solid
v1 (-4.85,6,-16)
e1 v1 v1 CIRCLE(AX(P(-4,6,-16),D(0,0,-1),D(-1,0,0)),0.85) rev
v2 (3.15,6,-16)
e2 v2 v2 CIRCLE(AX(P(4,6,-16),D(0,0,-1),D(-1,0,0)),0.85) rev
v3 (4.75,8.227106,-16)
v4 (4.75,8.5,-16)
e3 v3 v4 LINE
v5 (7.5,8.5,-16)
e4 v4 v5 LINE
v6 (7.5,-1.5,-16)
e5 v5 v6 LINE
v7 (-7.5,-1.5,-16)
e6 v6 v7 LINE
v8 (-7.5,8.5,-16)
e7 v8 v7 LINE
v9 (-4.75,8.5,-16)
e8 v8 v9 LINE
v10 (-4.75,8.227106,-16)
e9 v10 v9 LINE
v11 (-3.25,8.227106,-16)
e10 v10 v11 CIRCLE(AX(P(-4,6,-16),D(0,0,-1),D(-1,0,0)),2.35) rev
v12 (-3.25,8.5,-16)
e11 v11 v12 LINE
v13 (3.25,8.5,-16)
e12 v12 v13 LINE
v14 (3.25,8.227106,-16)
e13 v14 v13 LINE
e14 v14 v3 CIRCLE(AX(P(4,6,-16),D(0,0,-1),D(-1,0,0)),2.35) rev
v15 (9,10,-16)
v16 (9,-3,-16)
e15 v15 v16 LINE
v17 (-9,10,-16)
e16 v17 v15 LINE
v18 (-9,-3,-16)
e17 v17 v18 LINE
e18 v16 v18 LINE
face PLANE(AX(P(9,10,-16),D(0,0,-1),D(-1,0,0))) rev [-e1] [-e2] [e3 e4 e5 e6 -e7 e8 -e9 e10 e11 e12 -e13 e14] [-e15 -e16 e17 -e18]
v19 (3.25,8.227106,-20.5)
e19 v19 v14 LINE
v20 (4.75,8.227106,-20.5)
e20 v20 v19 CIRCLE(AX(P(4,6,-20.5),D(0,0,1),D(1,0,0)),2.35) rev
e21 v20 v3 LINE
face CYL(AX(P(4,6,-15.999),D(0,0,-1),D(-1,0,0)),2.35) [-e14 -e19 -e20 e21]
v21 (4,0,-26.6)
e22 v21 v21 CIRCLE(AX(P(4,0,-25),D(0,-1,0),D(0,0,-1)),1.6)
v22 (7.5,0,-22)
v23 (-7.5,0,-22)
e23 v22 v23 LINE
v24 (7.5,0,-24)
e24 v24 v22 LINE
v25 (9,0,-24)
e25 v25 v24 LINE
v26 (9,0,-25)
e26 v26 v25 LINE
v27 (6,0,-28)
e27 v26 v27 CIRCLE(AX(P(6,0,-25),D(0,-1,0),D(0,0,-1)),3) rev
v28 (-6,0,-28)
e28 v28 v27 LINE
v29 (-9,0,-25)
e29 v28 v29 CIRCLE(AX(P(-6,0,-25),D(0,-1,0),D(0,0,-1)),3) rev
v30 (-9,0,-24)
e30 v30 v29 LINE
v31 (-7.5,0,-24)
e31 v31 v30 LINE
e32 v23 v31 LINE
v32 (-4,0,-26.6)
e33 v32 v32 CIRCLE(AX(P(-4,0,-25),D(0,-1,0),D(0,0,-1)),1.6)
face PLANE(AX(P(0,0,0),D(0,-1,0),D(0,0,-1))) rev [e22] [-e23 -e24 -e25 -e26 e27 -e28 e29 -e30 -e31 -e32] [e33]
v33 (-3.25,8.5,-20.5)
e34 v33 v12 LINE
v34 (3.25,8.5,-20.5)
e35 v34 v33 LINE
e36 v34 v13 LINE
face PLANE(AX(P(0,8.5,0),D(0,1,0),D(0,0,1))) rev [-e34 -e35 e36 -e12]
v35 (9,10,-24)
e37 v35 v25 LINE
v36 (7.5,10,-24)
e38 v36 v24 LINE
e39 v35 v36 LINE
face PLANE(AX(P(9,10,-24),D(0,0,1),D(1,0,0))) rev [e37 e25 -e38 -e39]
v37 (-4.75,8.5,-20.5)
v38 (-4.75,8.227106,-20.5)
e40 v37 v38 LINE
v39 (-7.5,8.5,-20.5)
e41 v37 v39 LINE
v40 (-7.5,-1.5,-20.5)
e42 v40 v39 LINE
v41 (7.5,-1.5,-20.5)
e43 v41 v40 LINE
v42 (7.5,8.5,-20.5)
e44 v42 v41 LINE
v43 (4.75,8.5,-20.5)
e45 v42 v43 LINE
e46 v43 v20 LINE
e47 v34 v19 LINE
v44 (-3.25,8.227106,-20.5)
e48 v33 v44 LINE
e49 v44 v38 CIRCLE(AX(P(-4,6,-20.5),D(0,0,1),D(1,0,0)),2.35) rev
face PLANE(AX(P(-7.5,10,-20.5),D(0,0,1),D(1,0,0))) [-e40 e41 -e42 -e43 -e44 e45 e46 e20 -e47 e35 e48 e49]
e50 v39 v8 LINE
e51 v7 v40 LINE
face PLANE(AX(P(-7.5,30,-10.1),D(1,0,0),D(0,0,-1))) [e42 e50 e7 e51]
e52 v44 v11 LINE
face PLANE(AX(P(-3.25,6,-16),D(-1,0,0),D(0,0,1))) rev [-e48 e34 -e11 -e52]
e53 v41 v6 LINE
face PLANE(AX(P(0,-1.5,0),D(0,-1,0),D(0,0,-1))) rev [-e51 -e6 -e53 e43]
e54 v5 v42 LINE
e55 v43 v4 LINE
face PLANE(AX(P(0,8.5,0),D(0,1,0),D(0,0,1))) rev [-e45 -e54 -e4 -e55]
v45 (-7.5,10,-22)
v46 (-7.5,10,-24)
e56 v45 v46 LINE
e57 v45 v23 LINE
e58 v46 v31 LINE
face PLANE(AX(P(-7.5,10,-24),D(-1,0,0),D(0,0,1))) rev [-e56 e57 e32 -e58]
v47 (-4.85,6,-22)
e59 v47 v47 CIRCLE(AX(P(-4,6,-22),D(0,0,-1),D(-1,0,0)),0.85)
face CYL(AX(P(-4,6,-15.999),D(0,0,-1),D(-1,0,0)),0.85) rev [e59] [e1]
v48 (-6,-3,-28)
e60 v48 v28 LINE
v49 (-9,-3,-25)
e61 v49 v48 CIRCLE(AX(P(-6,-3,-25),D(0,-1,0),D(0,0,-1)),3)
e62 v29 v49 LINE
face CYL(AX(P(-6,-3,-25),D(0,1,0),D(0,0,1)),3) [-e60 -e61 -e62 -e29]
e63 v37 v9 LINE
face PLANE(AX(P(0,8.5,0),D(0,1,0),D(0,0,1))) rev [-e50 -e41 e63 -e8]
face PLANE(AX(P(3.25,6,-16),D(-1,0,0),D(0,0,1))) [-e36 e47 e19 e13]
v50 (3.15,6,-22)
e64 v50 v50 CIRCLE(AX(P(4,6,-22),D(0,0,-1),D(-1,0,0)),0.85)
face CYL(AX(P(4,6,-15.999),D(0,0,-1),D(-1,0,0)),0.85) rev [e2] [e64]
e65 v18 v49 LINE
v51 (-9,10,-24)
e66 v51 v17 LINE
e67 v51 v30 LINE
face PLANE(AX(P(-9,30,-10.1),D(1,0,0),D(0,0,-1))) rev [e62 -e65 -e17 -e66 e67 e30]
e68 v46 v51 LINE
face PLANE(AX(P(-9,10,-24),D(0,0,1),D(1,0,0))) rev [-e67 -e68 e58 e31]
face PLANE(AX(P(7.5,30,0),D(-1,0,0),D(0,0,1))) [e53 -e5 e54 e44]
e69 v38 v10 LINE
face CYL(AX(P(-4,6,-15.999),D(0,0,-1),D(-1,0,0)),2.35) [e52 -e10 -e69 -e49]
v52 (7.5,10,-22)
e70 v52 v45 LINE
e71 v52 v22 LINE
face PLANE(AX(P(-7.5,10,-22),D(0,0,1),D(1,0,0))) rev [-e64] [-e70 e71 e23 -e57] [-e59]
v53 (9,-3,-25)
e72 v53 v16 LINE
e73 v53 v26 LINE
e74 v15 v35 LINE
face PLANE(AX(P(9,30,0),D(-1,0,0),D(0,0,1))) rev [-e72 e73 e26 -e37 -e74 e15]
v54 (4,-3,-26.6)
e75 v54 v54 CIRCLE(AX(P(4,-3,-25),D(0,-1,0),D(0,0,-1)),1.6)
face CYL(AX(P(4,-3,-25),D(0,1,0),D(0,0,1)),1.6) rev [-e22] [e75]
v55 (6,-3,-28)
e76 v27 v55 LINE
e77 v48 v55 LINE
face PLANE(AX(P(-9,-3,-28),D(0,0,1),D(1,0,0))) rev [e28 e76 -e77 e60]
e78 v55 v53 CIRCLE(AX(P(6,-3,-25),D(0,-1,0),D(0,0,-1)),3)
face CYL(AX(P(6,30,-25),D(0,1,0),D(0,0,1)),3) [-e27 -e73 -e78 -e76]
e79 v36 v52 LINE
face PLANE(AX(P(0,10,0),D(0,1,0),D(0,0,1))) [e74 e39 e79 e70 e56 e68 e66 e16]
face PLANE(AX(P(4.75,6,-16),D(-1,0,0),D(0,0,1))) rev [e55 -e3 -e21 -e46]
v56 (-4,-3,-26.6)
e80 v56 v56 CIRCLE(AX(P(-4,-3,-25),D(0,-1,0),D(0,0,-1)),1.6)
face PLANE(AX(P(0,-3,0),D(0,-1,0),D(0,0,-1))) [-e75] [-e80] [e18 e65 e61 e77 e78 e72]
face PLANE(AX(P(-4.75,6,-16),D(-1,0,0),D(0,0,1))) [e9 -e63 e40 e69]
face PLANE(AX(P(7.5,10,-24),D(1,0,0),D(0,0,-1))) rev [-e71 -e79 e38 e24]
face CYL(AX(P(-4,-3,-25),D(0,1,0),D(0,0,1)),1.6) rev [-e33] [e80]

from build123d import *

# Parameters (mm, degrees)
EXTRUDE_1_DEPTH     = 30
SKETCH_2_W          = 18
SKETCH_2_H          = 28
SKETCH_2_R          = 1.6
EXTRUDE_2_DEPTH     = 3
SKETCH_3_W          = 1.1
SKETCH_3_H          = 6
CUT_EXTRUDE_1_DEPTH = 15
FILLET_1_R          = 3
EXTRUDE_3_DEPTH     = 1.5
SKETCH_6_W          = 8
SKETCH_6_H          = 7.1
EXTRUDE_4_DEPTH     = 30
SKETCH_7_W          = 18
SKETCH_7_H          = 30
CUT_EXTRUDE_3_DEPTH = 10.5
EXTRUDE_5_DEPTH     = 10
CUT_EXTRUDE_5_REACH = 24.392
SKETCH_9_W          = 18
SKETCH_9_H          = 16
CUT_EXTRUDE_6_REACH = 16.731
SKETCH_11_R         = 0.85
SHELL_START         = -20.5
SHELL_1_OUTLINE_W   = 15
SHELL_1_OUTLINE_H   = 10
SHELL_1_OUTLINE_R   = 2.35
SHELL_1_DEPTH       = 4.5
RIB_1_REACH         = 20.028
SKETCH_12_WALLS_W   = 1.5
SKETCH_12_WALLS_H   = 42.055512754


# Read off the part's stored shape, not the designer's step: 抽壳1
with BuildPart() as part:
    # 草图1 → 凸台-拉伸1 (new body)
    with BuildSketch(Plane(origin=(0, 0, 0), x_dir=(1, 0, 0), z_dir=(0, 1, 0))):
        Polygon((-9, 10.1), (-9, 0), (9, 0), (9, 10.1), (4, 10.1), (4, 3), (-4, 3), (-4, 10.1), align=None)
    extrude(amount=EXTRUDE_1_DEPTH)

    # 草图2 → 凸台-拉伸2 (add)
    with BuildSketch(Plane.XZ):
        with Locations((0, -14)):
            Rectangle(SKETCH_2_W, SKETCH_2_H)
        with Locations(Location((4, -25, 0), (0, 0, 270))):
            Circle(SKETCH_2_R, mode=Mode.SUBTRACT)
        with Locations(Location((-4, -25, 0), (0, 0, 270))):
            Circle(SKETCH_2_R, mode=Mode.SUBTRACT)
    extrude(amount=EXTRUDE_2_DEPTH)

    # 草图3 → 切除-拉伸1 (cut)
    with BuildSketch(Plane(origin=(0, 30, 0), x_dir=(1, 0, 0), z_dir=(0, 1, 0))):
        with Locations((-6.95, 7.1)):
            Rectangle(SKETCH_3_W, SKETCH_3_H)
        with Locations((6.95, 7.1)):
            Rectangle(SKETCH_3_W, SKETCH_3_H)
    extrude(amount=-CUT_EXTRUDE_1_DEPTH, mode=Mode.SUBTRACT)

    # 圆角1
    fillet_1_edges = [part.edges().sort_by_distance(p)[0] for p in [
        (9, -1.5, -28),
        (-9, -1.5, -28),
    ]]
    fillet(fillet_1_edges, radius=FILLET_1_R)

    # 草图5 → 凸台-拉伸3 (add)
    with BuildSketch(Plane.ZY.offset(9)):
        Polygon((-10.1, 0), (-10.1, 6), (-15.1, 0), align=None)
    extrude_3 = extrude(amount=-EXTRUDE_3_DEPTH)

    # 镜向1: 凸台-拉伸3 across plane
    add(extrude_3.mirror(Plane(origin=(0, 0, 0), x_dir=(0, 0, 1), z_dir=(1, 0, 0))))

    # 草图6 → 凸台-拉伸4 (add)
    with BuildSketch(Plane(origin=(0, 0, 0), x_dir=(1, 0, 0), z_dir=(0, 1, 0))):
        with Locations((0, 6.55)):
            Rectangle(SKETCH_6_W, SKETCH_6_H)
    extrude(amount=EXTRUDE_4_DEPTH)

    # 草图7 → 切除-拉伸3 (cut, symmetric)
    with BuildSketch(Plane(origin=(0, 0, -10.1), x_dir=(-1, 0, 0), z_dir=(0, 0, -1))):
        with Locations((0, 15)):
            Rectangle(SKETCH_7_W, SKETCH_7_H)
    extrude(amount=CUT_EXTRUDE_3_DEPTH, both=True, mode=Mode.SUBTRACT)

    # 草图10 → 凸台-拉伸5 (add)
    with BuildSketch(Plane(origin=(0, 0, 0), x_dir=(1, 0, 0), z_dir=(0, 1, 0))):
        Polygon((9, 16), (-9, 16), (-9, 24), (-7.5, 24), (-7.5, 22), (7.5, 22), (7.5, 24), (9, 24), align=None)
    extrude(amount=EXTRUDE_5_DEPTH)

    # 草图9 → 切除-拉伸5 (cut, up to next)
    with BuildSketch(Plane(origin=(0, 0, -10.1), x_dir=(-1, 0, 0), z_dir=(0, 1, 0)), mode=Mode.PRIVATE) as cut_extrude_5_sk1:
        with Locations((0, 2.1)):
            Rectangle(SKETCH_9_W, SKETCH_9_H)
    cut_extrude_5_tool1 = extrude(cut_extrude_5_sk1.sketch, amount=-CUT_EXTRUDE_5_REACH, mode=Mode.PRIVATE) & part.part
    add(cut_extrude_5_tool1.solids().sort_by_distance((0, 0, -8))[0], mode=Mode.SUBTRACT)

    # 草图11 → 切除-拉伸6 (cut, up to next)
    with BuildSketch(Plane(origin=(0, 0, -22), x_dir=(-1, 0, 0), z_dir=(0, 0, -1)), mode=Mode.PRIVATE) as cut_extrude_6_sk1:
        with Locations((4, 6)):
            Circle(SKETCH_11_R)
    cut_extrude_6_tool1 = extrude(cut_extrude_6_sk1.sketch, amount=-CUT_EXTRUDE_6_REACH, mode=Mode.PRIVATE) & part.part
    # 草图11 → 切除-拉伸6 (cut, up to next)
    with BuildSketch(Plane(origin=(0, 0, -22), x_dir=(-1, 0, 0), z_dir=(0, 0, -1)), mode=Mode.PRIVATE) as cut_extrude_6_sk2:
        with Locations((-4, 6)):
            Circle(SKETCH_11_R)
    cut_extrude_6_tool2 = extrude(cut_extrude_6_sk2.sketch, amount=-CUT_EXTRUDE_6_REACH, mode=Mode.PRIVATE) & part.part
    add(cut_extrude_6_tool1.solids().sort_by_distance((-4, 6, -22))[0], mode=Mode.SUBTRACT)
    add(cut_extrude_6_tool2.solids().sort_by_distance((4, 6, -22))[0], mode=Mode.SUBTRACT)

    # 抽壳1 outline → 抽壳1 (cut)
    with BuildSketch(Plane.XY.offset(SHELL_START)):
        with Locations((0, 3.5)):
            Rectangle(SHELL_1_OUTLINE_W, SHELL_1_OUTLINE_H)
        with Locations((-4, 6)):
            Circle(SHELL_1_OUTLINE_R, mode=Mode.SUBTRACT)
        with Locations((4, 6)):
            Circle(SHELL_1_OUTLINE_R, mode=Mode.SUBTRACT)
    extrude(amount=SHELL_1_DEPTH, mode=Mode.SUBTRACT)

    # 草图12 walls → 筋1 (add, up to next)
    with BuildSketch(Plane.XY.offset(-16), mode=Mode.PRIVATE) as rib_1_sk1:
        with Locations((4, 8)):
            Rectangle(SKETCH_12_WALLS_W, SKETCH_12_WALLS_H)
    rib_1_tool1 = extrude(rib_1_sk1.sketch, amount=-RIB_1_REACH, mode=Mode.PRIVATE) - part.part
    # 草图12 walls → 筋1 (add, up to next)
    with BuildSketch(Plane.XY.offset(-16), mode=Mode.PRIVATE) as rib_1_sk2:
        with Locations((-4, 8)):
            Rectangle(SKETCH_12_WALLS_W, SKETCH_12_WALLS_H)
    rib_1_tool2 = extrude(rib_1_sk2.sketch, amount=-RIB_1_REACH, mode=Mode.PRIVATE) - part.part
    add(rib_1_tool1.solids().sort_by_distance((4, 8, -16))[0])
    add(rib_1_tool2.solids().sort_by_distance((-4, 8, -16))[0])


solid = part.part
